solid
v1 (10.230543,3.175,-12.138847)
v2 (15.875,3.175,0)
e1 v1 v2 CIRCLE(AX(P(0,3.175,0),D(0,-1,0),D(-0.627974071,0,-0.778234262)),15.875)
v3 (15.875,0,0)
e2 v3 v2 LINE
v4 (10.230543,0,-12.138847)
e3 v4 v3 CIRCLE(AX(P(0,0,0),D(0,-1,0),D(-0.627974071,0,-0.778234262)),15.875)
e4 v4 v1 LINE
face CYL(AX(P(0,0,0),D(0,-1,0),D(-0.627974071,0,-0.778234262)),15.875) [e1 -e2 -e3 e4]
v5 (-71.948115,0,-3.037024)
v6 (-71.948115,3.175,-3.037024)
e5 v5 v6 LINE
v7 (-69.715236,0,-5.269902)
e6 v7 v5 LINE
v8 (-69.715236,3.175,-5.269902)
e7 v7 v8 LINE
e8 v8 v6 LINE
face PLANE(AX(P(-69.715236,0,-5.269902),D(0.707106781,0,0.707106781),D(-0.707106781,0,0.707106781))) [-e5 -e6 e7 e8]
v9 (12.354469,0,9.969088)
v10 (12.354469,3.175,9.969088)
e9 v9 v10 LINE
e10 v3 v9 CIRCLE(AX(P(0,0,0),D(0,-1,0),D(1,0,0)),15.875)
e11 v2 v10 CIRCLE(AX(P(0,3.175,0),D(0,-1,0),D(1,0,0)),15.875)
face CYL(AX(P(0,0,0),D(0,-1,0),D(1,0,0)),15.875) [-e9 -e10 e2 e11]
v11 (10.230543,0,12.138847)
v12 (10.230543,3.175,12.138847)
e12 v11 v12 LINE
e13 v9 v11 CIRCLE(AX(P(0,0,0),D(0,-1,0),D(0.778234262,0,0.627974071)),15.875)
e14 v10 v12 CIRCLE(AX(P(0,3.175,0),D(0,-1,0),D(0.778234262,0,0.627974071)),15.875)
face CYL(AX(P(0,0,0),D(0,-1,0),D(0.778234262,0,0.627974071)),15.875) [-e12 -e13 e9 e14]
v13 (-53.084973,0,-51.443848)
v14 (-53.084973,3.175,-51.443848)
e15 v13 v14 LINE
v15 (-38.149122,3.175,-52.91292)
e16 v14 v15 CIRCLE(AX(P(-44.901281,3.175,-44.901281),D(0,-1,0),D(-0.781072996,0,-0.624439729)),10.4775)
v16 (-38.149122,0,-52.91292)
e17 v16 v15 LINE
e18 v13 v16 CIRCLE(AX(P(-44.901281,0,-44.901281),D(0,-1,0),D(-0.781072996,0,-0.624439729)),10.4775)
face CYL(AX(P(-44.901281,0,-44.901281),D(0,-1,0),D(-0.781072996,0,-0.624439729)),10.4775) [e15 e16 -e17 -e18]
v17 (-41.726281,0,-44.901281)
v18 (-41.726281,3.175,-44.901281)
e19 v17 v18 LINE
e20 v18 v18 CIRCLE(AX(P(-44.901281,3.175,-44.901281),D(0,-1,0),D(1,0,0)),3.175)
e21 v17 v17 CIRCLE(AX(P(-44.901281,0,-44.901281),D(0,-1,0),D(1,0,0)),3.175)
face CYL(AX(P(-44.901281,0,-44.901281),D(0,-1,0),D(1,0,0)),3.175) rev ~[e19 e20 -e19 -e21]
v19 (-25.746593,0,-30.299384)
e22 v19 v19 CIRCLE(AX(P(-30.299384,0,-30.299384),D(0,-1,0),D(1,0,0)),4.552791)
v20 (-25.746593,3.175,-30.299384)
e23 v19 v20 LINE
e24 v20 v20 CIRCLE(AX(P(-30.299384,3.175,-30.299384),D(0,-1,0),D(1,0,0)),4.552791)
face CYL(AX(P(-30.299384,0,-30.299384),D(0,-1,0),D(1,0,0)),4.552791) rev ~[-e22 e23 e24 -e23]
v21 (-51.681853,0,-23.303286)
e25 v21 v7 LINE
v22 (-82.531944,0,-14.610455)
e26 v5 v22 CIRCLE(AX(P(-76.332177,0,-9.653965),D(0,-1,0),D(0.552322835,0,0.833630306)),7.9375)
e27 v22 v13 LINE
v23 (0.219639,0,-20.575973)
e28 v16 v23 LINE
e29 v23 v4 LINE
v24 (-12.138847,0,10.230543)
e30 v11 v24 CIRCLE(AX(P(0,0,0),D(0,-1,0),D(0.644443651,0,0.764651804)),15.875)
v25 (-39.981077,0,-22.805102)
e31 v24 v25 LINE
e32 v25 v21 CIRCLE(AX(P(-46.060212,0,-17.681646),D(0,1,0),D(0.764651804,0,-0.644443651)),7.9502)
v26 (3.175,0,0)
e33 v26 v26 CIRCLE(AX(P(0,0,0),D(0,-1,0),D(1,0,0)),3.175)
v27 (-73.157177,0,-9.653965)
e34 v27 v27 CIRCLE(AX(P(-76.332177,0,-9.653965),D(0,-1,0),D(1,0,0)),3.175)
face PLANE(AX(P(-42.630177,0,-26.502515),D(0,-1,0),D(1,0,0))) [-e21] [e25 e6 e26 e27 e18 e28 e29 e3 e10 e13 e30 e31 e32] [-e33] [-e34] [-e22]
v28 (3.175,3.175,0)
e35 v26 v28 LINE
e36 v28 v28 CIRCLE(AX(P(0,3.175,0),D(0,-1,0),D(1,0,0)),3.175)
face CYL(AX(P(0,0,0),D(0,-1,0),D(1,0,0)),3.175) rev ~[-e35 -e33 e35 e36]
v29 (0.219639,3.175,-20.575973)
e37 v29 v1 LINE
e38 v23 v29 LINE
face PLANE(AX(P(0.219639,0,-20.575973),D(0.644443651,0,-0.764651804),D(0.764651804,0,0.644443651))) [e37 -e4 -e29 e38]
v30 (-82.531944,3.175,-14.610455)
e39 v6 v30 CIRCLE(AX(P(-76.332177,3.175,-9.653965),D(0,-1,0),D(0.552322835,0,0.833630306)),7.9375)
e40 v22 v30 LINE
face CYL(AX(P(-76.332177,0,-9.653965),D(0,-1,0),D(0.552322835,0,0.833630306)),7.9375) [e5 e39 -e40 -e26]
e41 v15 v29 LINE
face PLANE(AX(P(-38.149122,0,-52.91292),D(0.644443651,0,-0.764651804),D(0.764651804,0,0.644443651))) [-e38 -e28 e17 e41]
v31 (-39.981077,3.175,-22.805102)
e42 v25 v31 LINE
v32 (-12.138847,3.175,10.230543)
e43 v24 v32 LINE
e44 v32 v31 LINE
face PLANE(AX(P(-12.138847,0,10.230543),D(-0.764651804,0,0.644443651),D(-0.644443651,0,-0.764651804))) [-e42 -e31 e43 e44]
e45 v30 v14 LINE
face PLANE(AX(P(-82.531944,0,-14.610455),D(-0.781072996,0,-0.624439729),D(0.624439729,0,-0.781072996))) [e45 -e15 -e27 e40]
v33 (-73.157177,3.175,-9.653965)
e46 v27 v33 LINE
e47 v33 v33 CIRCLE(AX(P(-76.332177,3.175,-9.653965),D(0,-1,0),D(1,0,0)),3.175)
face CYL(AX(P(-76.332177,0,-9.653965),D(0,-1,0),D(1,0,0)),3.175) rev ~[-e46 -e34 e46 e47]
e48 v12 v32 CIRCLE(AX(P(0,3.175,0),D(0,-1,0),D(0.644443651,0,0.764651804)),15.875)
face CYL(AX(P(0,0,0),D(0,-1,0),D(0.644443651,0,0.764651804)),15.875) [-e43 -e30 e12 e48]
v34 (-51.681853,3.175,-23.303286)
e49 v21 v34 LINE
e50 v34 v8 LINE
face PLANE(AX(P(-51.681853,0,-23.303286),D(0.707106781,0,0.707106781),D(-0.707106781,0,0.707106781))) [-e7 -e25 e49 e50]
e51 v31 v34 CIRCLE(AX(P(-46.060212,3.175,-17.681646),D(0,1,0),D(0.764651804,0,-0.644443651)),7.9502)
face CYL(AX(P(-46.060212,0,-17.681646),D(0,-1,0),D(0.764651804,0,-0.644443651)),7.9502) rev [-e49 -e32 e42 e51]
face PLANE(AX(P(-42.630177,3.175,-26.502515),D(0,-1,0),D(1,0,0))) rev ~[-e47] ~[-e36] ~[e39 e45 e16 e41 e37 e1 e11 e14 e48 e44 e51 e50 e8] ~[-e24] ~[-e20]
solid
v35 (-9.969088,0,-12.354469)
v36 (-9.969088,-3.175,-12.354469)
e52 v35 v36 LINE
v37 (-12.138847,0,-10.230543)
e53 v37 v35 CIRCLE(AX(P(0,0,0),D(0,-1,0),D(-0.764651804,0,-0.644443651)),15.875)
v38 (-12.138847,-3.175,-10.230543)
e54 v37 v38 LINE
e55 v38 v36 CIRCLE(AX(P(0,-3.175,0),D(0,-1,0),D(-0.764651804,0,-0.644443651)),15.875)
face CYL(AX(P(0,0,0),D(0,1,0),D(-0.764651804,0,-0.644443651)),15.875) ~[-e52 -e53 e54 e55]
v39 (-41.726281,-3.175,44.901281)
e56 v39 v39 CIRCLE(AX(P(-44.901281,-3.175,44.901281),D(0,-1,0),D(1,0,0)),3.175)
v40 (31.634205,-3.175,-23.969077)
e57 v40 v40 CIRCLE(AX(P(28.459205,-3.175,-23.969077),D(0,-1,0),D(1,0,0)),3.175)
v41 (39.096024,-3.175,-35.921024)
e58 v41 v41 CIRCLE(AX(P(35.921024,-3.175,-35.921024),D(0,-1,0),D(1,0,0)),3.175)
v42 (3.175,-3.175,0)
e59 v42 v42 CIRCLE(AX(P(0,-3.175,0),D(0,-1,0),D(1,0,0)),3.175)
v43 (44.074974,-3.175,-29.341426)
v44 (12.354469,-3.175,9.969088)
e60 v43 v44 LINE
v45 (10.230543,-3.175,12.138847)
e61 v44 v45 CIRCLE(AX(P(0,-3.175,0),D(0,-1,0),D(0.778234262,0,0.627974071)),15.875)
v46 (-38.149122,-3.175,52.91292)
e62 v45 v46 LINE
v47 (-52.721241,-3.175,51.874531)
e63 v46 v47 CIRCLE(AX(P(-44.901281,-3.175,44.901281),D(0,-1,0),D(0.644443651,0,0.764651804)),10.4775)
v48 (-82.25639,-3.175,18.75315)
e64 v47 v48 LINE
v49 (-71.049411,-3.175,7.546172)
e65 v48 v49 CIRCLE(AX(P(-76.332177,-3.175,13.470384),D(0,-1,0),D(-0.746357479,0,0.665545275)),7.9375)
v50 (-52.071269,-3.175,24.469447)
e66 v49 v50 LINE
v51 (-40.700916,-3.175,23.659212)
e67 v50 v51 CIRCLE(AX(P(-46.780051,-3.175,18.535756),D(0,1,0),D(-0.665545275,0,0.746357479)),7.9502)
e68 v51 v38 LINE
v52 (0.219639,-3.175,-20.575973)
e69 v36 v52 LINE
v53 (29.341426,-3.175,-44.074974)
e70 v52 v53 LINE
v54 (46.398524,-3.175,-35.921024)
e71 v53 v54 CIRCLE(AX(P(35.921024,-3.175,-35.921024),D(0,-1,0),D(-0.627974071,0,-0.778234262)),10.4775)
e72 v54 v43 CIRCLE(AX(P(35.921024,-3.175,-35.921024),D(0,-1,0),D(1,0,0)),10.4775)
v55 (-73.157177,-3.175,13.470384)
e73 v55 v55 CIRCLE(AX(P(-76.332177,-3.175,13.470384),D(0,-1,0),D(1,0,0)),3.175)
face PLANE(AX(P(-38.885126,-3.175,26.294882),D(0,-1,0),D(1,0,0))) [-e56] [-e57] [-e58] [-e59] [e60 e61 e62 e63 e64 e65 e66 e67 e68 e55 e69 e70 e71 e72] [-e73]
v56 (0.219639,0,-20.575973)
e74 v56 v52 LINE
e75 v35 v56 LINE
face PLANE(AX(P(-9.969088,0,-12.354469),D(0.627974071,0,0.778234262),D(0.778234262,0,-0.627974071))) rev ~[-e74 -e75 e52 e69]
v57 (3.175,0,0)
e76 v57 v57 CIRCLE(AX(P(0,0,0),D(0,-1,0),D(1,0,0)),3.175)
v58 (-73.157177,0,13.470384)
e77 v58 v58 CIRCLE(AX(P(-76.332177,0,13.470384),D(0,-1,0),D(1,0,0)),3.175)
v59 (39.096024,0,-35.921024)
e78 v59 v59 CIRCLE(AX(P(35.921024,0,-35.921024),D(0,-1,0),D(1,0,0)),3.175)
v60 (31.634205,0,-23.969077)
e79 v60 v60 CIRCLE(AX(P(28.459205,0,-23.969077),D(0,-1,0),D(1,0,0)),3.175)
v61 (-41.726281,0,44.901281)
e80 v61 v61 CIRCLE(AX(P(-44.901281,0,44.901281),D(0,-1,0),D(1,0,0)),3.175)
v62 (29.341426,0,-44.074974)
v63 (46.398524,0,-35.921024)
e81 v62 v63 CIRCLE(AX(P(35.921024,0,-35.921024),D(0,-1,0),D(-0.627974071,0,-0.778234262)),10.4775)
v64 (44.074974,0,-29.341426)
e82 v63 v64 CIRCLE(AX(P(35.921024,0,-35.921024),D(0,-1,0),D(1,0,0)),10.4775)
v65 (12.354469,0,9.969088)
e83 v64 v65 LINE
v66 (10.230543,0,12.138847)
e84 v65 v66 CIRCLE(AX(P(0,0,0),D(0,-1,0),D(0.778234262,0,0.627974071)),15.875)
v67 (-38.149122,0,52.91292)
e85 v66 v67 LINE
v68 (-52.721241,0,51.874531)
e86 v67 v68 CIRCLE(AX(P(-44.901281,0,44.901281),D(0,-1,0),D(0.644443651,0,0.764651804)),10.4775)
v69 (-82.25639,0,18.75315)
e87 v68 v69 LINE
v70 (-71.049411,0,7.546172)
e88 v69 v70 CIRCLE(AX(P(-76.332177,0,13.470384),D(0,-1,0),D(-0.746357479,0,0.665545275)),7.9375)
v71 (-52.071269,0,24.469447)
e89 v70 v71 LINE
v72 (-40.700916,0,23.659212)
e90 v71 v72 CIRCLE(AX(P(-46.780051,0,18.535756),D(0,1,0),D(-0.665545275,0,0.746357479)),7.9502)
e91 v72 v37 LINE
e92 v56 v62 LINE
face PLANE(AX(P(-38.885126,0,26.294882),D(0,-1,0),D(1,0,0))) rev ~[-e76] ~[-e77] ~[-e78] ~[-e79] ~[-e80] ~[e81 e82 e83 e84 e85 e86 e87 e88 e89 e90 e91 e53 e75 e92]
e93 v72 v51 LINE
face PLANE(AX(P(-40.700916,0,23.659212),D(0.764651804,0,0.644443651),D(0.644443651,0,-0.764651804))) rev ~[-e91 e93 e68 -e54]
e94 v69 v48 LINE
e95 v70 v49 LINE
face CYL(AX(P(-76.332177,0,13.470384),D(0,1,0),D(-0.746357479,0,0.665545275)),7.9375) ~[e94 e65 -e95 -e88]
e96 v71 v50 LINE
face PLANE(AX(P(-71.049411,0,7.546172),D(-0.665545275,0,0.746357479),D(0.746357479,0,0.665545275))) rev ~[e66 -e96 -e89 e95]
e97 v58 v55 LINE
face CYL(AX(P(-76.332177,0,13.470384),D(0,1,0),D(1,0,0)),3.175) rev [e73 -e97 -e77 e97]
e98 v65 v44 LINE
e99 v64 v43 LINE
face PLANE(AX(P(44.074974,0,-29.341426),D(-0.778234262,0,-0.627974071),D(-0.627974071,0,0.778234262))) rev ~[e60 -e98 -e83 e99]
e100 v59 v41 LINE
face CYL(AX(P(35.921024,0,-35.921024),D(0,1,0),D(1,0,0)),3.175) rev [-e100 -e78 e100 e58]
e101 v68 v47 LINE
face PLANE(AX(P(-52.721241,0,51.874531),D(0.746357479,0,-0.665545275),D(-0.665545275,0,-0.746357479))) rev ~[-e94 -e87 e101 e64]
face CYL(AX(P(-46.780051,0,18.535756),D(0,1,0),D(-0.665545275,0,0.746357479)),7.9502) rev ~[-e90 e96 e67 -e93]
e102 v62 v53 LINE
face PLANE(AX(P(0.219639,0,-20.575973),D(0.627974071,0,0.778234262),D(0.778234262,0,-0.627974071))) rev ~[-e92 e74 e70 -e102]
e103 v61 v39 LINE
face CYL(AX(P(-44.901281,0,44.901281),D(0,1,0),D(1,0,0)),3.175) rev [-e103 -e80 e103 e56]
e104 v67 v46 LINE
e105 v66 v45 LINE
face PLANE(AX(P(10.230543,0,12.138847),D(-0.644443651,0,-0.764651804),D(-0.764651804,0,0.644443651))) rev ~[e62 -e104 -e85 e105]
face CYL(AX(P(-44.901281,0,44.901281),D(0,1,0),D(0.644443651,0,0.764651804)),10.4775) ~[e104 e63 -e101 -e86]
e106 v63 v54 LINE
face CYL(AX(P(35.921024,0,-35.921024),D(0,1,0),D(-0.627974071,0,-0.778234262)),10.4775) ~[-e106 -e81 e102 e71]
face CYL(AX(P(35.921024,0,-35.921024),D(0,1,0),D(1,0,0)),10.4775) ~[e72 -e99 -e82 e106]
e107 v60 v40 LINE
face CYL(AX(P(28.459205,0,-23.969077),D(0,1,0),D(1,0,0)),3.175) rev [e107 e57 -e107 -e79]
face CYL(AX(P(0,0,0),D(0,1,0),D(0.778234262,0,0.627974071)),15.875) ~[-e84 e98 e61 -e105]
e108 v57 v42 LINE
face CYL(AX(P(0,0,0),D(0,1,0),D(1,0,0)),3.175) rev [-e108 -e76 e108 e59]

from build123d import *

# Parameters (mm, degrees)
F0_R     = 3.175
F0_R_2   = 3.9751
F1_DEPTH = 3.175
F0_R_3   = 4.55279125
F2_DEPTH = 3.175


# Not quite as in the source:
# - a feature names something its author has since deleted; it is built from what else it names


with BuildPart() as f1:
    # F0 (on Front) → F1 (new body)
    with BuildSketch(Plane.XZ):
        with BuildLine():
            ThreePointArc((-82.2563895183, 18.7531498051), (-73.5054766898, 20.8875043398), (-68.3946770291, 13.4703841816))
            ThreePointArc((-68.3946770291, 13.4703841816), (-69.08870209, 10.2244671992), (-71.0494114056, 7.5461716924))
            Line((-71.0494114056, 7.5461716924), (-52.0712687873, 24.4694470818))
            ThreePointArc((-52.0712687873, 24.4694470818), (-46.2149635715, 26.465847689), (-40.7009159693, 23.6592117657))
            Line((-40.7009159693, 23.6592117657), (-20.7610835727, 0))
            Line((-20.7610835727, 0), (-12.1388473833, 10.2305429575))
            ThreePointArc((-12.1388473833, 10.2305429575), (-1.349375, 15.817547601), (10.2305429575, 12.1388473833))
            Line((10.2305429575, 12.1388473833), (-38.1491222534, 52.9129198783))
            ThreePointArc((-38.1491222534, 52.9129198783), (-35.4006557474, 49.3189874266), (-34.4237806053, 44.9012806053))
            ThreePointArc((-34.4237806053, 44.9012806053), (-48.6325250533, 35.1106819965), (-52.7212410911, 51.8745312283))
            Line((-52.7212410911, 51.8745312283), (-82.2563895183, 18.7531498051))
        make_face()
        with BuildLine():
            ThreePointArc((-71.0494114056, 7.5461716924), (-69.08870209, 10.2244671992), (-68.3946770291, 13.4703841816))
            ThreePointArc((-68.3946770291, 13.4703841816), (-73.5054766898, 20.8875043398), (-82.2563895183, 18.7531498051))
            ThreePointArc((-82.2563895183, 18.7531498051), (-81.9448371048, 7.8577241059), (-71.0494114056, 7.5461716924))
        make_face()
        with Locations((-76.3321770291, 13.4703841816)):
            Circle(F0_R, mode=Mode.SUBTRACT)
        with BuildLine():
            ThreePointArc((-38.1491222534, 52.9129198783), (-45.6460041086, 55.35228023), (-52.7212410911, 51.8745312283))
            ThreePointArc((-52.7212410911, 51.8745312283), (-48.6325250533, 35.1106819965), (-34.4237806053, 44.9012806053))
            ThreePointArc((-34.4237806053, 44.9012806053), (-35.4006557474, 49.3189874266), (-38.1491222534, 52.9129198783))
        make_face()
        with Locations((-44.9012806053, 44.9012806053)):
            Circle(F0_R, mode=Mode.SUBTRACT)
        with BuildLine():
            Line((-12.1388473833, 10.2305429575), (-20.7610835727, 0))
            Line((-20.7610835727, 0), (-12.1388473833, -10.2305429575))
            ThreePointArc((-12.1388473833, -10.2305429575), (-15.875, 0), (-12.1388473833, 10.2305429575))
        make_face()
        with BuildLine():
            ThreePointArc((10.2305429575, -12.1388473833), (0.1694484732, -15.8740956346), (-9.9690883749, -12.354468907))
            Line((-9.9690883749, -12.354468907), (0.2196387976, -20.5759733985))
            Line((0.2196387976, -20.5759733985), (10.2305429575, -12.1388473833))
        make_face()
        with BuildLine():
            Line((44.0749739629, -29.3414261569), (12.354468907, 9.9690883749))
            ThreePointArc((12.354468907, 9.9690883749), (14.9690149793, 5.2862288591), (15.875, 0))
            ThreePointArc((15.875, 0), (14.3948861484, -6.6934951837), (10.2305429575, -12.1388473833))
            Line((10.2305429575, -12.1388473833), (0.2196387976, -20.5759733985))
            Line((0.2196387976, -20.5759733985), (29.3414261569, -44.0749739629))
            ThreePointArc((29.3414261569, -44.0749739629), (28.5123131844, -28.5123131844), (44.0749739629, -29.3414261569))
        make_face()
        with Locations((28.4592052015, -23.969077141)):
            Circle(F0_R, mode=Mode.SUBTRACT)
        with BuildLine():
            ThreePointArc((46.3985244843, -35.9210244843), (45.8005743706, -32.4321134373), (44.0749739629, -29.3414261569))
            ThreePointArc((44.0749739629, -29.3414261569), (28.5123131844, -28.5123131844), (29.3414261569, -44.0749739629))
            ThreePointArc((29.3414261569, -44.0749739629), (40.4398885437, -45.3739538642), (46.3985244843, -35.9210244843))
        make_face()
        with Locations((35.9210244843, -35.9210244843)):
            Circle(F0_R, mode=Mode.SUBTRACT)
        with BuildLine():
            ThreePointArc((12.354468907, 9.9690883749), (11.3444988329, 11.1048625039), (10.2305429575, 12.1388473833))
            ThreePointArc((10.2305429575, 12.1388473833), (-1.349375, 15.817547601), (-12.1388473833, 10.2305429575))
            ThreePointArc((-12.1388473833, 10.2305429575), (-15.875, 0), (-12.1388473833, -10.2305429575))
            ThreePointArc((-12.1388473833, -10.2305429575), (-11.1048625039, -11.3444988329), (-9.9690883749, -12.354468907))
            ThreePointArc((-9.9690883749, -12.354468907), (0.1694484732, -15.8740956346), (10.2305429575, -12.1388473833))
            ThreePointArc((10.2305429575, -12.1388473833), (14.3948861484, -6.6934951837), (15.875, 0))
            ThreePointArc((15.875, 0), (14.9690149793, 5.2862288591), (12.354468907, 9.9690883749))
        make_face()
        Circle(F0_R_2, mode=Mode.SUBTRACT)
        Circle(F0_R_2)
        Circle(F0_R, mode=Mode.SUBTRACT)
    extrude(amount=F1_DEPTH)


with BuildPart() as f2:
    # F0 (on Front) → F2 (new body)
    with BuildSketch(Plane.XZ):
        with BuildLine():
            Line((-12.1388473833, -10.2305429575), (-20.7610835727, 0))
            Line((-20.7610835727, 0), (-39.9810774323, -22.8051016586))
            ThreePointArc((-39.9810774323, -22.8051016586), (-45.7220225821, -25.6246494482), (-51.6818525337, -23.3032860773))
            Line((-51.6818525337, -23.3032860773), (-69.715236479, -5.2699021319))
            ThreePointArc((-69.715236479, -5.2699021319), (-68.7319838781, -7.3646480711), (-68.3946770291, -9.6539646322))
            ThreePointArc((-68.3946770291, -9.6539646322), (-73.7060338073, -17.144443791), (-82.5319439339, -14.6104549809))
            Line((-82.5319439339, -14.6104549809), (-53.0849729197, -51.4438478655))
            ThreePointArc((-53.0849729197, -51.4438478655), (-48.3677896582, -35.0138481157), (-34.4237806053, -44.9012806053))
            ThreePointArc((-34.4237806053, -44.9012806053), (-35.4006557474, -49.3189874266), (-38.1491222534, -52.9129198783))
            Line((-38.1491222534, -52.9129198783), (0.2196387976, -20.5759733985))
            Line((0.2196387976, -20.5759733985), (-9.9690883749, -12.354468907))
            ThreePointArc((-9.9690883749, -12.354468907), (-11.1048625039, -11.3444988329), (-12.1388473833, -10.2305429575))
        make_face()
        with Locations((-30.2993841525, -30.2993841525)):
            Circle(F0_R_3, mode=Mode.SUBTRACT)
        with BuildLine():
            ThreePointArc((12.354468907, 9.9690883749), (11.3444988329, 11.1048625039), (10.2305429575, 12.1388473833))
            ThreePointArc((10.2305429575, 12.1388473833), (-1.349375, 15.817547601), (-12.1388473833, 10.2305429575))
            ThreePointArc((-12.1388473833, 10.2305429575), (-15.875, 0), (-12.1388473833, -10.2305429575))
            ThreePointArc((-12.1388473833, -10.2305429575), (-11.1048625039, -11.3444988329), (-9.9690883749, -12.354468907))
            ThreePointArc((-9.9690883749, -12.354468907), (0.1694484732, -15.8740956346), (10.2305429575, -12.1388473833))
            ThreePointArc((10.2305429575, -12.1388473833), (14.3948861484, -6.6934951837), (15.875, 0))
            ThreePointArc((15.875, 0), (14.9690149793, 5.2862288591), (12.354468907, 9.9690883749))
        make_face()
        Circle(F0_R_2, mode=Mode.SUBTRACT)
        with BuildLine():
            ThreePointArc((-53.0849729197, -51.4438478655), (-45.9268855566, -55.3284633857), (-38.1491222534, -52.9129198783))
            ThreePointArc((-38.1491222534, -52.9129198783), (-35.4006557474, -49.3189874266), (-34.4237806053, -44.9012806053))
            ThreePointArc((-34.4237806053, -44.9012806053), (-48.3677896582, -35.0138481157), (-53.0849729197, -51.4438478655))
        make_face()
        with Locations((-44.9012806053, -44.9012806053)):
            Circle(F0_R, mode=Mode.SUBTRACT)
        with BuildLine():
            ThreePointArc((-68.3946770291, -9.6539646322), (-68.7319838781, -7.3646480711), (-69.715236479, -5.2699021319))
            Line((-69.715236479, -5.2699021319), (-71.9481145287, -3.0370240822))
            ThreePointArc((-71.9481145287, -3.0370240822), (-82.1896740468, -4.2973206328), (-82.5319439339, -14.6104549809))
            ThreePointArc((-82.5319439339, -14.6104549809), (-73.7060338073, -17.144443791), (-68.3946770291, -9.6539646322))
        make_face()
        with Locations((-76.3321770291, -9.6539646322)):
            Circle(F0_R, mode=Mode.SUBTRACT)
        Circle(F0_R_2)
        Circle(F0_R, mode=Mode.SUBTRACT)
        with BuildLine():
            Line((-12.1388473833, 10.2305429575), (-20.7610835727, 0))
            Line((-20.7610835727, 0), (-12.1388473833, -10.2305429575))
            ThreePointArc((-12.1388473833, -10.2305429575), (-15.875, 0), (-12.1388473833, 10.2305429575))
        make_face()
        with BuildLine():
            ThreePointArc((10.2305429575, -12.1388473833), (0.1694484732, -15.8740956346), (-9.9690883749, -12.354468907))
            Line((-9.9690883749, -12.354468907), (0.2196387976, -20.5759733985))
            Line((0.2196387976, -20.5759733985), (10.2305429575, -12.1388473833))
        make_face()
    extrude(amount=-F2_DEPTH)


solid = Compound([f1.part, f2.part])
